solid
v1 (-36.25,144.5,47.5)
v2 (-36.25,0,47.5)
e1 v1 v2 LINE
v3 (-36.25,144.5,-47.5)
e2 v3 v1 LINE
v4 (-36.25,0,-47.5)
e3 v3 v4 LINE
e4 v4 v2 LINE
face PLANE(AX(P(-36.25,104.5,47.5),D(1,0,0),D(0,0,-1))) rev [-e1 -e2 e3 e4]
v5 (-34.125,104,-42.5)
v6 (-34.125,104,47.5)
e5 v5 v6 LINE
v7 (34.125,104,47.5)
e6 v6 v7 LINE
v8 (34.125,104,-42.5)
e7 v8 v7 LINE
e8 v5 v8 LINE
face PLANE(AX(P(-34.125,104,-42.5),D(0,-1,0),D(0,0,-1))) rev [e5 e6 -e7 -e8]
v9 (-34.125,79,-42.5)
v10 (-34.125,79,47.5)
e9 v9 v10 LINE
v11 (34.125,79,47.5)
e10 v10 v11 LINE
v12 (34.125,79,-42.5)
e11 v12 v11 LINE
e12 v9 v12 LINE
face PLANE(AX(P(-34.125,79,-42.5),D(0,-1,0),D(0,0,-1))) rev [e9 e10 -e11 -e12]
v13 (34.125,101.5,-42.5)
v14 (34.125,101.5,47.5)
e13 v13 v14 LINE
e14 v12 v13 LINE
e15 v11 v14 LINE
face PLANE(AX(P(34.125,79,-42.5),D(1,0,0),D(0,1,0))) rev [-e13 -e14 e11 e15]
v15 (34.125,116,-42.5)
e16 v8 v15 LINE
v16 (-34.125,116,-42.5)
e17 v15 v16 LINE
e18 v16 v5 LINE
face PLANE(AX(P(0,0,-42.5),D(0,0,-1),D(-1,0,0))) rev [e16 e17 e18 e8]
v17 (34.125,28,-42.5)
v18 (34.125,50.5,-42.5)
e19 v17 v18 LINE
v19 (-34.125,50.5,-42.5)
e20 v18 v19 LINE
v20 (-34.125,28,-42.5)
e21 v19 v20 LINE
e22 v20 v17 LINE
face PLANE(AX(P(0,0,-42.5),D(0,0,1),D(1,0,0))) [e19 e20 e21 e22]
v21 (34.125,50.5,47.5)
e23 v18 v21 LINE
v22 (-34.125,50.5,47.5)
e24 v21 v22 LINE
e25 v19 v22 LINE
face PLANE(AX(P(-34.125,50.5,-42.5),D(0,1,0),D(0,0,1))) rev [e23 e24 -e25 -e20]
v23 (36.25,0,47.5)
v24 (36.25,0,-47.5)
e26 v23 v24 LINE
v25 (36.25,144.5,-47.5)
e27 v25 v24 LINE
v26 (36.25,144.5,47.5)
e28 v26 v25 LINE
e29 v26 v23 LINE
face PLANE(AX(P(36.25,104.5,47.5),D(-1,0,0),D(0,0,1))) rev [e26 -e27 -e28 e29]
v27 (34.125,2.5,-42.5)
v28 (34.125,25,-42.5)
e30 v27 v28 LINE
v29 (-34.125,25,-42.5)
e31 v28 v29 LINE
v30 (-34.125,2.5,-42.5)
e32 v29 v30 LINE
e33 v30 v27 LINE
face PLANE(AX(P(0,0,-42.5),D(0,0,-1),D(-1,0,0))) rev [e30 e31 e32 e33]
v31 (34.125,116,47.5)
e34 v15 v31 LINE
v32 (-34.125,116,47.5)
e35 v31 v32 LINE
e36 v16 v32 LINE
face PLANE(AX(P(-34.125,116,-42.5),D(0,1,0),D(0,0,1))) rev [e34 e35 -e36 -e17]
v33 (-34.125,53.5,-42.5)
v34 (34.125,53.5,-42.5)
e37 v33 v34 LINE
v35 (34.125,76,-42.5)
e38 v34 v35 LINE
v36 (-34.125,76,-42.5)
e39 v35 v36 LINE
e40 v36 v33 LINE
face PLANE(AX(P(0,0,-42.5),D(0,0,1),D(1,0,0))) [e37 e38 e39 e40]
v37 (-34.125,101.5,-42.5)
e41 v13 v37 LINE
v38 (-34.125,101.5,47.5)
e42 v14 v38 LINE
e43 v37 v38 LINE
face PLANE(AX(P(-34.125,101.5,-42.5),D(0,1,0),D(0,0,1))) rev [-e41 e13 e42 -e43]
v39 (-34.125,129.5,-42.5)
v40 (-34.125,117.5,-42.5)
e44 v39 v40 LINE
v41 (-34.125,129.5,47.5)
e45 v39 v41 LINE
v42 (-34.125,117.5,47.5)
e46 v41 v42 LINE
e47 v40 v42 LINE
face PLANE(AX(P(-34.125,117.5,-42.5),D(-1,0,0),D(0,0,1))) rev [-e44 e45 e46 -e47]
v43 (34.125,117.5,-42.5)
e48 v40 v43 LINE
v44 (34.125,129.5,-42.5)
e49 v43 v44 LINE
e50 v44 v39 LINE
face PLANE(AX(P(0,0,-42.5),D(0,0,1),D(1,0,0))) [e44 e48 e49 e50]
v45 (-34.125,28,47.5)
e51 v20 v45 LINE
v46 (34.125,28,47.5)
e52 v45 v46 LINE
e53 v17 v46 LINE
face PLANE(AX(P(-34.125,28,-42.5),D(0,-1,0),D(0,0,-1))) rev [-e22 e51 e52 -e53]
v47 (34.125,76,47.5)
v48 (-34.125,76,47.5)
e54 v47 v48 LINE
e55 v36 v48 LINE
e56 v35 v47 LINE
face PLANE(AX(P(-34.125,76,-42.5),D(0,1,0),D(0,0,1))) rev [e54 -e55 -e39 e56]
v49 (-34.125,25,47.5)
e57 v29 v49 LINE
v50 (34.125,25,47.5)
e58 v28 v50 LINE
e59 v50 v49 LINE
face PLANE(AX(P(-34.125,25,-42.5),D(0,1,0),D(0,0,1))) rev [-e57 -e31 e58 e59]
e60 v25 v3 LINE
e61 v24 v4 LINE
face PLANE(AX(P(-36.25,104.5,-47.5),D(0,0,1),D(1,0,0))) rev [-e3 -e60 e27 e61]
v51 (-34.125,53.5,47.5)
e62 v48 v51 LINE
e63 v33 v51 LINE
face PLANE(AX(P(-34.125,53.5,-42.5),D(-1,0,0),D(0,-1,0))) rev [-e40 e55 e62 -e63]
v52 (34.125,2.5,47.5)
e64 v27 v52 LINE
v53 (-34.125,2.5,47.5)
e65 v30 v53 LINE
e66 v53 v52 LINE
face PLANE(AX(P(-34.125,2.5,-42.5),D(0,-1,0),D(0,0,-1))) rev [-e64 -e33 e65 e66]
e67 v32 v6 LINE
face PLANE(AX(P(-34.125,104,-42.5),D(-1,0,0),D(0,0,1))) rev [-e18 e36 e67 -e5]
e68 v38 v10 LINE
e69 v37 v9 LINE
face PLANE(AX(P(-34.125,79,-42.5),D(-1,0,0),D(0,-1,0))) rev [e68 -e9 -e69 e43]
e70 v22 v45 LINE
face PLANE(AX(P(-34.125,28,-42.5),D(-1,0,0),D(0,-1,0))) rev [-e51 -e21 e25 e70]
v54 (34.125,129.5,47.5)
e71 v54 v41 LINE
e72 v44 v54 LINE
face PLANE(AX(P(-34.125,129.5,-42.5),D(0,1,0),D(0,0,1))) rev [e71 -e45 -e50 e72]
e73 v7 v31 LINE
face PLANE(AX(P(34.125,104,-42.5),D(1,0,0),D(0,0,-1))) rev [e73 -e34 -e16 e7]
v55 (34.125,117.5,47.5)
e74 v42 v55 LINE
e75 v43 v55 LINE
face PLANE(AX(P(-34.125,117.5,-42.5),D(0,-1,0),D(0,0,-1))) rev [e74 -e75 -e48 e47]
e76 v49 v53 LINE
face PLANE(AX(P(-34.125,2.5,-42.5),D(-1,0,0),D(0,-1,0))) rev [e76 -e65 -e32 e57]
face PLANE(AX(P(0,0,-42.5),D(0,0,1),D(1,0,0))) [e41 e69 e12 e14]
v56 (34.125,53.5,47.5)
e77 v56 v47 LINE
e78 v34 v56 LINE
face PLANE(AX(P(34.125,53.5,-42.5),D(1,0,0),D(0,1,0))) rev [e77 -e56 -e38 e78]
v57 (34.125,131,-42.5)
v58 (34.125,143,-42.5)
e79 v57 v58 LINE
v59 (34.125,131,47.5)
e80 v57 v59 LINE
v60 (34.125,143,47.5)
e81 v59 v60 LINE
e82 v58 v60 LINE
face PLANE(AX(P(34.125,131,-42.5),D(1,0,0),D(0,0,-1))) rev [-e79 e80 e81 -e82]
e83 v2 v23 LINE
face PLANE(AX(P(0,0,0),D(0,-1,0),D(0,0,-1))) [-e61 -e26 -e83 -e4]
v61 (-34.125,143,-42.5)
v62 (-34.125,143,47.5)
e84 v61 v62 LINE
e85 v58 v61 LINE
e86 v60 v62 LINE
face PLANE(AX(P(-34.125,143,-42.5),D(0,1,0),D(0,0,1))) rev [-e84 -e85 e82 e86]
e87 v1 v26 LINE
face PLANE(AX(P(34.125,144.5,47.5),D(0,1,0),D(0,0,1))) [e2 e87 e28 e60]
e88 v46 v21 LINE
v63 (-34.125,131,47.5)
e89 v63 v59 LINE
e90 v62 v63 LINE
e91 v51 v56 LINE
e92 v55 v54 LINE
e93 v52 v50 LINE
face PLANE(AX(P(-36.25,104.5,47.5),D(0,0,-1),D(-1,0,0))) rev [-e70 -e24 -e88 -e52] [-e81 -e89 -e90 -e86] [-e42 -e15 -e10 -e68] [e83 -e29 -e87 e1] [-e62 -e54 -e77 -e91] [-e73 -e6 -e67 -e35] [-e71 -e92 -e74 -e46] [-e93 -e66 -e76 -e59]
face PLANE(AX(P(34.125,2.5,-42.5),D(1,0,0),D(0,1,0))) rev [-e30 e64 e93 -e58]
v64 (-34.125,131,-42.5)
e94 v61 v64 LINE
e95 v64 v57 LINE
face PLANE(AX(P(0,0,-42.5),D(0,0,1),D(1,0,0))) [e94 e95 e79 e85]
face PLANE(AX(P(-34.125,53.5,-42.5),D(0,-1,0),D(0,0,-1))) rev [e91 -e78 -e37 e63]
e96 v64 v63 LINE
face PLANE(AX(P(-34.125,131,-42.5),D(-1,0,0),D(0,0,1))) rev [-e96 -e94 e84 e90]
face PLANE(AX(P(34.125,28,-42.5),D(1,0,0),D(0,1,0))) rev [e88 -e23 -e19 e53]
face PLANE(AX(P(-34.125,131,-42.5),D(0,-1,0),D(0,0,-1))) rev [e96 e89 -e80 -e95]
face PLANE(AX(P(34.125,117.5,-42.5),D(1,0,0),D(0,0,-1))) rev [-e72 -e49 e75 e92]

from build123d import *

# Parameters (mm, degrees)
SKETCH1_W           = 72.5
SKETCH1_H           = 95
BOSS_EXTRUDE1_DEPTH = 104.5
SKETCH2_W           = 68.25
SKETCH2_H           = 22.5
CUT_EXTRUDE1_DEPTH  = 90
SKETCH3_W           = 72.5
SKETCH3_H           = 95
BOSS_EXTRUDE2_DEPTH = 175.5
SKETCH4_W           = 68.25
SKETCH4_H           = 12
CUT_EXTRUDE3_DEPTH  = 90


with BuildPart() as part:
    # Sketch1 → Boss-Extrude1 (new body)
    with BuildSketch(Plane(origin=(0, 0, 0), x_dir=(1, 0, 0), z_dir=(0, 1, 0))):
        Rectangle(SKETCH1_W, SKETCH1_H)
    extrude(amount=BOSS_EXTRUDE1_DEPTH)

    # Sketch2 → Cut-Extrude1 (cut)
    with BuildSketch(Plane.XY.offset(47.5)):
        with Locations((0, 13.75)):
            Rectangle(SKETCH2_W, SKETCH2_H)
        with Locations((0, 39.25)):
            Rectangle(SKETCH2_W, SKETCH2_H)
        with Locations((0, 64.75)):
            Rectangle(SKETCH2_W, SKETCH2_H)
        with Locations((0, 90.25)):
            Rectangle(SKETCH2_W, SKETCH2_H)
    extrude(amount=-CUT_EXTRUDE1_DEPTH, mode=Mode.SUBTRACT)

    # Sketch3 → Boss-Extrude2 (add)
    with BuildSketch(Plane(origin=(0, 104.5, 0), x_dir=(1, 0, 0), z_dir=(0, 1, 0))):
        Rectangle(SKETCH3_W, SKETCH3_H)
    extrude(amount=BOSS_EXTRUDE2_DEPTH)

    # Sketch4 → Cut-Extrude3 (cut)
    with BuildSketch(Plane.XY.offset(47.5)):
        with Locations((0, 110)):
            Rectangle(SKETCH4_W, SKETCH4_H)
        with Locations((0, 123.5)):
            Rectangle(SKETCH4_W, SKETCH4_H)
        with Locations((0, 137)):
            Rectangle(SKETCH4_W, SKETCH4_H)
        with Locations((0, 150.5)):
            Rectangle(SKETCH4_W, SKETCH4_H)
        with Locations((0, 164)):
            Rectangle(SKETCH4_W, SKETCH4_H)
        with Locations((0, 177.5)):
            Rectangle(SKETCH4_W, SKETCH4_H)
        with Locations((0, 191)):
            Rectangle(SKETCH4_W, SKETCH4_H)
        with Locations((0, 204.5)):
            Rectangle(SKETCH4_W, SKETCH4_H)
        with Locations((0, 218)):
            Rectangle(SKETCH4_W, SKETCH4_H)
        with Locations((0, 231.5)):
            Rectangle(SKETCH4_W, SKETCH4_H)
        with Locations((0, 245)):
            Rectangle(SKETCH4_W, SKETCH4_H)
        with Locations((0, 258.5)):
            Rectangle(SKETCH4_W, SKETCH4_H)
        with Locations((0, 272)):
            Rectangle(SKETCH4_W, SKETCH4_H)
    extrude(amount=-CUT_EXTRUDE3_DEPTH, mode=Mode.SUBTRACT)

    # Split1
    split(bisect_by=Plane(origin=(-34.125, 144.5, -42.5), x_dir=(0, 0, -1), z_dir=(0, -1, 0)), keep=Keep.TOP)


solid = part.part
